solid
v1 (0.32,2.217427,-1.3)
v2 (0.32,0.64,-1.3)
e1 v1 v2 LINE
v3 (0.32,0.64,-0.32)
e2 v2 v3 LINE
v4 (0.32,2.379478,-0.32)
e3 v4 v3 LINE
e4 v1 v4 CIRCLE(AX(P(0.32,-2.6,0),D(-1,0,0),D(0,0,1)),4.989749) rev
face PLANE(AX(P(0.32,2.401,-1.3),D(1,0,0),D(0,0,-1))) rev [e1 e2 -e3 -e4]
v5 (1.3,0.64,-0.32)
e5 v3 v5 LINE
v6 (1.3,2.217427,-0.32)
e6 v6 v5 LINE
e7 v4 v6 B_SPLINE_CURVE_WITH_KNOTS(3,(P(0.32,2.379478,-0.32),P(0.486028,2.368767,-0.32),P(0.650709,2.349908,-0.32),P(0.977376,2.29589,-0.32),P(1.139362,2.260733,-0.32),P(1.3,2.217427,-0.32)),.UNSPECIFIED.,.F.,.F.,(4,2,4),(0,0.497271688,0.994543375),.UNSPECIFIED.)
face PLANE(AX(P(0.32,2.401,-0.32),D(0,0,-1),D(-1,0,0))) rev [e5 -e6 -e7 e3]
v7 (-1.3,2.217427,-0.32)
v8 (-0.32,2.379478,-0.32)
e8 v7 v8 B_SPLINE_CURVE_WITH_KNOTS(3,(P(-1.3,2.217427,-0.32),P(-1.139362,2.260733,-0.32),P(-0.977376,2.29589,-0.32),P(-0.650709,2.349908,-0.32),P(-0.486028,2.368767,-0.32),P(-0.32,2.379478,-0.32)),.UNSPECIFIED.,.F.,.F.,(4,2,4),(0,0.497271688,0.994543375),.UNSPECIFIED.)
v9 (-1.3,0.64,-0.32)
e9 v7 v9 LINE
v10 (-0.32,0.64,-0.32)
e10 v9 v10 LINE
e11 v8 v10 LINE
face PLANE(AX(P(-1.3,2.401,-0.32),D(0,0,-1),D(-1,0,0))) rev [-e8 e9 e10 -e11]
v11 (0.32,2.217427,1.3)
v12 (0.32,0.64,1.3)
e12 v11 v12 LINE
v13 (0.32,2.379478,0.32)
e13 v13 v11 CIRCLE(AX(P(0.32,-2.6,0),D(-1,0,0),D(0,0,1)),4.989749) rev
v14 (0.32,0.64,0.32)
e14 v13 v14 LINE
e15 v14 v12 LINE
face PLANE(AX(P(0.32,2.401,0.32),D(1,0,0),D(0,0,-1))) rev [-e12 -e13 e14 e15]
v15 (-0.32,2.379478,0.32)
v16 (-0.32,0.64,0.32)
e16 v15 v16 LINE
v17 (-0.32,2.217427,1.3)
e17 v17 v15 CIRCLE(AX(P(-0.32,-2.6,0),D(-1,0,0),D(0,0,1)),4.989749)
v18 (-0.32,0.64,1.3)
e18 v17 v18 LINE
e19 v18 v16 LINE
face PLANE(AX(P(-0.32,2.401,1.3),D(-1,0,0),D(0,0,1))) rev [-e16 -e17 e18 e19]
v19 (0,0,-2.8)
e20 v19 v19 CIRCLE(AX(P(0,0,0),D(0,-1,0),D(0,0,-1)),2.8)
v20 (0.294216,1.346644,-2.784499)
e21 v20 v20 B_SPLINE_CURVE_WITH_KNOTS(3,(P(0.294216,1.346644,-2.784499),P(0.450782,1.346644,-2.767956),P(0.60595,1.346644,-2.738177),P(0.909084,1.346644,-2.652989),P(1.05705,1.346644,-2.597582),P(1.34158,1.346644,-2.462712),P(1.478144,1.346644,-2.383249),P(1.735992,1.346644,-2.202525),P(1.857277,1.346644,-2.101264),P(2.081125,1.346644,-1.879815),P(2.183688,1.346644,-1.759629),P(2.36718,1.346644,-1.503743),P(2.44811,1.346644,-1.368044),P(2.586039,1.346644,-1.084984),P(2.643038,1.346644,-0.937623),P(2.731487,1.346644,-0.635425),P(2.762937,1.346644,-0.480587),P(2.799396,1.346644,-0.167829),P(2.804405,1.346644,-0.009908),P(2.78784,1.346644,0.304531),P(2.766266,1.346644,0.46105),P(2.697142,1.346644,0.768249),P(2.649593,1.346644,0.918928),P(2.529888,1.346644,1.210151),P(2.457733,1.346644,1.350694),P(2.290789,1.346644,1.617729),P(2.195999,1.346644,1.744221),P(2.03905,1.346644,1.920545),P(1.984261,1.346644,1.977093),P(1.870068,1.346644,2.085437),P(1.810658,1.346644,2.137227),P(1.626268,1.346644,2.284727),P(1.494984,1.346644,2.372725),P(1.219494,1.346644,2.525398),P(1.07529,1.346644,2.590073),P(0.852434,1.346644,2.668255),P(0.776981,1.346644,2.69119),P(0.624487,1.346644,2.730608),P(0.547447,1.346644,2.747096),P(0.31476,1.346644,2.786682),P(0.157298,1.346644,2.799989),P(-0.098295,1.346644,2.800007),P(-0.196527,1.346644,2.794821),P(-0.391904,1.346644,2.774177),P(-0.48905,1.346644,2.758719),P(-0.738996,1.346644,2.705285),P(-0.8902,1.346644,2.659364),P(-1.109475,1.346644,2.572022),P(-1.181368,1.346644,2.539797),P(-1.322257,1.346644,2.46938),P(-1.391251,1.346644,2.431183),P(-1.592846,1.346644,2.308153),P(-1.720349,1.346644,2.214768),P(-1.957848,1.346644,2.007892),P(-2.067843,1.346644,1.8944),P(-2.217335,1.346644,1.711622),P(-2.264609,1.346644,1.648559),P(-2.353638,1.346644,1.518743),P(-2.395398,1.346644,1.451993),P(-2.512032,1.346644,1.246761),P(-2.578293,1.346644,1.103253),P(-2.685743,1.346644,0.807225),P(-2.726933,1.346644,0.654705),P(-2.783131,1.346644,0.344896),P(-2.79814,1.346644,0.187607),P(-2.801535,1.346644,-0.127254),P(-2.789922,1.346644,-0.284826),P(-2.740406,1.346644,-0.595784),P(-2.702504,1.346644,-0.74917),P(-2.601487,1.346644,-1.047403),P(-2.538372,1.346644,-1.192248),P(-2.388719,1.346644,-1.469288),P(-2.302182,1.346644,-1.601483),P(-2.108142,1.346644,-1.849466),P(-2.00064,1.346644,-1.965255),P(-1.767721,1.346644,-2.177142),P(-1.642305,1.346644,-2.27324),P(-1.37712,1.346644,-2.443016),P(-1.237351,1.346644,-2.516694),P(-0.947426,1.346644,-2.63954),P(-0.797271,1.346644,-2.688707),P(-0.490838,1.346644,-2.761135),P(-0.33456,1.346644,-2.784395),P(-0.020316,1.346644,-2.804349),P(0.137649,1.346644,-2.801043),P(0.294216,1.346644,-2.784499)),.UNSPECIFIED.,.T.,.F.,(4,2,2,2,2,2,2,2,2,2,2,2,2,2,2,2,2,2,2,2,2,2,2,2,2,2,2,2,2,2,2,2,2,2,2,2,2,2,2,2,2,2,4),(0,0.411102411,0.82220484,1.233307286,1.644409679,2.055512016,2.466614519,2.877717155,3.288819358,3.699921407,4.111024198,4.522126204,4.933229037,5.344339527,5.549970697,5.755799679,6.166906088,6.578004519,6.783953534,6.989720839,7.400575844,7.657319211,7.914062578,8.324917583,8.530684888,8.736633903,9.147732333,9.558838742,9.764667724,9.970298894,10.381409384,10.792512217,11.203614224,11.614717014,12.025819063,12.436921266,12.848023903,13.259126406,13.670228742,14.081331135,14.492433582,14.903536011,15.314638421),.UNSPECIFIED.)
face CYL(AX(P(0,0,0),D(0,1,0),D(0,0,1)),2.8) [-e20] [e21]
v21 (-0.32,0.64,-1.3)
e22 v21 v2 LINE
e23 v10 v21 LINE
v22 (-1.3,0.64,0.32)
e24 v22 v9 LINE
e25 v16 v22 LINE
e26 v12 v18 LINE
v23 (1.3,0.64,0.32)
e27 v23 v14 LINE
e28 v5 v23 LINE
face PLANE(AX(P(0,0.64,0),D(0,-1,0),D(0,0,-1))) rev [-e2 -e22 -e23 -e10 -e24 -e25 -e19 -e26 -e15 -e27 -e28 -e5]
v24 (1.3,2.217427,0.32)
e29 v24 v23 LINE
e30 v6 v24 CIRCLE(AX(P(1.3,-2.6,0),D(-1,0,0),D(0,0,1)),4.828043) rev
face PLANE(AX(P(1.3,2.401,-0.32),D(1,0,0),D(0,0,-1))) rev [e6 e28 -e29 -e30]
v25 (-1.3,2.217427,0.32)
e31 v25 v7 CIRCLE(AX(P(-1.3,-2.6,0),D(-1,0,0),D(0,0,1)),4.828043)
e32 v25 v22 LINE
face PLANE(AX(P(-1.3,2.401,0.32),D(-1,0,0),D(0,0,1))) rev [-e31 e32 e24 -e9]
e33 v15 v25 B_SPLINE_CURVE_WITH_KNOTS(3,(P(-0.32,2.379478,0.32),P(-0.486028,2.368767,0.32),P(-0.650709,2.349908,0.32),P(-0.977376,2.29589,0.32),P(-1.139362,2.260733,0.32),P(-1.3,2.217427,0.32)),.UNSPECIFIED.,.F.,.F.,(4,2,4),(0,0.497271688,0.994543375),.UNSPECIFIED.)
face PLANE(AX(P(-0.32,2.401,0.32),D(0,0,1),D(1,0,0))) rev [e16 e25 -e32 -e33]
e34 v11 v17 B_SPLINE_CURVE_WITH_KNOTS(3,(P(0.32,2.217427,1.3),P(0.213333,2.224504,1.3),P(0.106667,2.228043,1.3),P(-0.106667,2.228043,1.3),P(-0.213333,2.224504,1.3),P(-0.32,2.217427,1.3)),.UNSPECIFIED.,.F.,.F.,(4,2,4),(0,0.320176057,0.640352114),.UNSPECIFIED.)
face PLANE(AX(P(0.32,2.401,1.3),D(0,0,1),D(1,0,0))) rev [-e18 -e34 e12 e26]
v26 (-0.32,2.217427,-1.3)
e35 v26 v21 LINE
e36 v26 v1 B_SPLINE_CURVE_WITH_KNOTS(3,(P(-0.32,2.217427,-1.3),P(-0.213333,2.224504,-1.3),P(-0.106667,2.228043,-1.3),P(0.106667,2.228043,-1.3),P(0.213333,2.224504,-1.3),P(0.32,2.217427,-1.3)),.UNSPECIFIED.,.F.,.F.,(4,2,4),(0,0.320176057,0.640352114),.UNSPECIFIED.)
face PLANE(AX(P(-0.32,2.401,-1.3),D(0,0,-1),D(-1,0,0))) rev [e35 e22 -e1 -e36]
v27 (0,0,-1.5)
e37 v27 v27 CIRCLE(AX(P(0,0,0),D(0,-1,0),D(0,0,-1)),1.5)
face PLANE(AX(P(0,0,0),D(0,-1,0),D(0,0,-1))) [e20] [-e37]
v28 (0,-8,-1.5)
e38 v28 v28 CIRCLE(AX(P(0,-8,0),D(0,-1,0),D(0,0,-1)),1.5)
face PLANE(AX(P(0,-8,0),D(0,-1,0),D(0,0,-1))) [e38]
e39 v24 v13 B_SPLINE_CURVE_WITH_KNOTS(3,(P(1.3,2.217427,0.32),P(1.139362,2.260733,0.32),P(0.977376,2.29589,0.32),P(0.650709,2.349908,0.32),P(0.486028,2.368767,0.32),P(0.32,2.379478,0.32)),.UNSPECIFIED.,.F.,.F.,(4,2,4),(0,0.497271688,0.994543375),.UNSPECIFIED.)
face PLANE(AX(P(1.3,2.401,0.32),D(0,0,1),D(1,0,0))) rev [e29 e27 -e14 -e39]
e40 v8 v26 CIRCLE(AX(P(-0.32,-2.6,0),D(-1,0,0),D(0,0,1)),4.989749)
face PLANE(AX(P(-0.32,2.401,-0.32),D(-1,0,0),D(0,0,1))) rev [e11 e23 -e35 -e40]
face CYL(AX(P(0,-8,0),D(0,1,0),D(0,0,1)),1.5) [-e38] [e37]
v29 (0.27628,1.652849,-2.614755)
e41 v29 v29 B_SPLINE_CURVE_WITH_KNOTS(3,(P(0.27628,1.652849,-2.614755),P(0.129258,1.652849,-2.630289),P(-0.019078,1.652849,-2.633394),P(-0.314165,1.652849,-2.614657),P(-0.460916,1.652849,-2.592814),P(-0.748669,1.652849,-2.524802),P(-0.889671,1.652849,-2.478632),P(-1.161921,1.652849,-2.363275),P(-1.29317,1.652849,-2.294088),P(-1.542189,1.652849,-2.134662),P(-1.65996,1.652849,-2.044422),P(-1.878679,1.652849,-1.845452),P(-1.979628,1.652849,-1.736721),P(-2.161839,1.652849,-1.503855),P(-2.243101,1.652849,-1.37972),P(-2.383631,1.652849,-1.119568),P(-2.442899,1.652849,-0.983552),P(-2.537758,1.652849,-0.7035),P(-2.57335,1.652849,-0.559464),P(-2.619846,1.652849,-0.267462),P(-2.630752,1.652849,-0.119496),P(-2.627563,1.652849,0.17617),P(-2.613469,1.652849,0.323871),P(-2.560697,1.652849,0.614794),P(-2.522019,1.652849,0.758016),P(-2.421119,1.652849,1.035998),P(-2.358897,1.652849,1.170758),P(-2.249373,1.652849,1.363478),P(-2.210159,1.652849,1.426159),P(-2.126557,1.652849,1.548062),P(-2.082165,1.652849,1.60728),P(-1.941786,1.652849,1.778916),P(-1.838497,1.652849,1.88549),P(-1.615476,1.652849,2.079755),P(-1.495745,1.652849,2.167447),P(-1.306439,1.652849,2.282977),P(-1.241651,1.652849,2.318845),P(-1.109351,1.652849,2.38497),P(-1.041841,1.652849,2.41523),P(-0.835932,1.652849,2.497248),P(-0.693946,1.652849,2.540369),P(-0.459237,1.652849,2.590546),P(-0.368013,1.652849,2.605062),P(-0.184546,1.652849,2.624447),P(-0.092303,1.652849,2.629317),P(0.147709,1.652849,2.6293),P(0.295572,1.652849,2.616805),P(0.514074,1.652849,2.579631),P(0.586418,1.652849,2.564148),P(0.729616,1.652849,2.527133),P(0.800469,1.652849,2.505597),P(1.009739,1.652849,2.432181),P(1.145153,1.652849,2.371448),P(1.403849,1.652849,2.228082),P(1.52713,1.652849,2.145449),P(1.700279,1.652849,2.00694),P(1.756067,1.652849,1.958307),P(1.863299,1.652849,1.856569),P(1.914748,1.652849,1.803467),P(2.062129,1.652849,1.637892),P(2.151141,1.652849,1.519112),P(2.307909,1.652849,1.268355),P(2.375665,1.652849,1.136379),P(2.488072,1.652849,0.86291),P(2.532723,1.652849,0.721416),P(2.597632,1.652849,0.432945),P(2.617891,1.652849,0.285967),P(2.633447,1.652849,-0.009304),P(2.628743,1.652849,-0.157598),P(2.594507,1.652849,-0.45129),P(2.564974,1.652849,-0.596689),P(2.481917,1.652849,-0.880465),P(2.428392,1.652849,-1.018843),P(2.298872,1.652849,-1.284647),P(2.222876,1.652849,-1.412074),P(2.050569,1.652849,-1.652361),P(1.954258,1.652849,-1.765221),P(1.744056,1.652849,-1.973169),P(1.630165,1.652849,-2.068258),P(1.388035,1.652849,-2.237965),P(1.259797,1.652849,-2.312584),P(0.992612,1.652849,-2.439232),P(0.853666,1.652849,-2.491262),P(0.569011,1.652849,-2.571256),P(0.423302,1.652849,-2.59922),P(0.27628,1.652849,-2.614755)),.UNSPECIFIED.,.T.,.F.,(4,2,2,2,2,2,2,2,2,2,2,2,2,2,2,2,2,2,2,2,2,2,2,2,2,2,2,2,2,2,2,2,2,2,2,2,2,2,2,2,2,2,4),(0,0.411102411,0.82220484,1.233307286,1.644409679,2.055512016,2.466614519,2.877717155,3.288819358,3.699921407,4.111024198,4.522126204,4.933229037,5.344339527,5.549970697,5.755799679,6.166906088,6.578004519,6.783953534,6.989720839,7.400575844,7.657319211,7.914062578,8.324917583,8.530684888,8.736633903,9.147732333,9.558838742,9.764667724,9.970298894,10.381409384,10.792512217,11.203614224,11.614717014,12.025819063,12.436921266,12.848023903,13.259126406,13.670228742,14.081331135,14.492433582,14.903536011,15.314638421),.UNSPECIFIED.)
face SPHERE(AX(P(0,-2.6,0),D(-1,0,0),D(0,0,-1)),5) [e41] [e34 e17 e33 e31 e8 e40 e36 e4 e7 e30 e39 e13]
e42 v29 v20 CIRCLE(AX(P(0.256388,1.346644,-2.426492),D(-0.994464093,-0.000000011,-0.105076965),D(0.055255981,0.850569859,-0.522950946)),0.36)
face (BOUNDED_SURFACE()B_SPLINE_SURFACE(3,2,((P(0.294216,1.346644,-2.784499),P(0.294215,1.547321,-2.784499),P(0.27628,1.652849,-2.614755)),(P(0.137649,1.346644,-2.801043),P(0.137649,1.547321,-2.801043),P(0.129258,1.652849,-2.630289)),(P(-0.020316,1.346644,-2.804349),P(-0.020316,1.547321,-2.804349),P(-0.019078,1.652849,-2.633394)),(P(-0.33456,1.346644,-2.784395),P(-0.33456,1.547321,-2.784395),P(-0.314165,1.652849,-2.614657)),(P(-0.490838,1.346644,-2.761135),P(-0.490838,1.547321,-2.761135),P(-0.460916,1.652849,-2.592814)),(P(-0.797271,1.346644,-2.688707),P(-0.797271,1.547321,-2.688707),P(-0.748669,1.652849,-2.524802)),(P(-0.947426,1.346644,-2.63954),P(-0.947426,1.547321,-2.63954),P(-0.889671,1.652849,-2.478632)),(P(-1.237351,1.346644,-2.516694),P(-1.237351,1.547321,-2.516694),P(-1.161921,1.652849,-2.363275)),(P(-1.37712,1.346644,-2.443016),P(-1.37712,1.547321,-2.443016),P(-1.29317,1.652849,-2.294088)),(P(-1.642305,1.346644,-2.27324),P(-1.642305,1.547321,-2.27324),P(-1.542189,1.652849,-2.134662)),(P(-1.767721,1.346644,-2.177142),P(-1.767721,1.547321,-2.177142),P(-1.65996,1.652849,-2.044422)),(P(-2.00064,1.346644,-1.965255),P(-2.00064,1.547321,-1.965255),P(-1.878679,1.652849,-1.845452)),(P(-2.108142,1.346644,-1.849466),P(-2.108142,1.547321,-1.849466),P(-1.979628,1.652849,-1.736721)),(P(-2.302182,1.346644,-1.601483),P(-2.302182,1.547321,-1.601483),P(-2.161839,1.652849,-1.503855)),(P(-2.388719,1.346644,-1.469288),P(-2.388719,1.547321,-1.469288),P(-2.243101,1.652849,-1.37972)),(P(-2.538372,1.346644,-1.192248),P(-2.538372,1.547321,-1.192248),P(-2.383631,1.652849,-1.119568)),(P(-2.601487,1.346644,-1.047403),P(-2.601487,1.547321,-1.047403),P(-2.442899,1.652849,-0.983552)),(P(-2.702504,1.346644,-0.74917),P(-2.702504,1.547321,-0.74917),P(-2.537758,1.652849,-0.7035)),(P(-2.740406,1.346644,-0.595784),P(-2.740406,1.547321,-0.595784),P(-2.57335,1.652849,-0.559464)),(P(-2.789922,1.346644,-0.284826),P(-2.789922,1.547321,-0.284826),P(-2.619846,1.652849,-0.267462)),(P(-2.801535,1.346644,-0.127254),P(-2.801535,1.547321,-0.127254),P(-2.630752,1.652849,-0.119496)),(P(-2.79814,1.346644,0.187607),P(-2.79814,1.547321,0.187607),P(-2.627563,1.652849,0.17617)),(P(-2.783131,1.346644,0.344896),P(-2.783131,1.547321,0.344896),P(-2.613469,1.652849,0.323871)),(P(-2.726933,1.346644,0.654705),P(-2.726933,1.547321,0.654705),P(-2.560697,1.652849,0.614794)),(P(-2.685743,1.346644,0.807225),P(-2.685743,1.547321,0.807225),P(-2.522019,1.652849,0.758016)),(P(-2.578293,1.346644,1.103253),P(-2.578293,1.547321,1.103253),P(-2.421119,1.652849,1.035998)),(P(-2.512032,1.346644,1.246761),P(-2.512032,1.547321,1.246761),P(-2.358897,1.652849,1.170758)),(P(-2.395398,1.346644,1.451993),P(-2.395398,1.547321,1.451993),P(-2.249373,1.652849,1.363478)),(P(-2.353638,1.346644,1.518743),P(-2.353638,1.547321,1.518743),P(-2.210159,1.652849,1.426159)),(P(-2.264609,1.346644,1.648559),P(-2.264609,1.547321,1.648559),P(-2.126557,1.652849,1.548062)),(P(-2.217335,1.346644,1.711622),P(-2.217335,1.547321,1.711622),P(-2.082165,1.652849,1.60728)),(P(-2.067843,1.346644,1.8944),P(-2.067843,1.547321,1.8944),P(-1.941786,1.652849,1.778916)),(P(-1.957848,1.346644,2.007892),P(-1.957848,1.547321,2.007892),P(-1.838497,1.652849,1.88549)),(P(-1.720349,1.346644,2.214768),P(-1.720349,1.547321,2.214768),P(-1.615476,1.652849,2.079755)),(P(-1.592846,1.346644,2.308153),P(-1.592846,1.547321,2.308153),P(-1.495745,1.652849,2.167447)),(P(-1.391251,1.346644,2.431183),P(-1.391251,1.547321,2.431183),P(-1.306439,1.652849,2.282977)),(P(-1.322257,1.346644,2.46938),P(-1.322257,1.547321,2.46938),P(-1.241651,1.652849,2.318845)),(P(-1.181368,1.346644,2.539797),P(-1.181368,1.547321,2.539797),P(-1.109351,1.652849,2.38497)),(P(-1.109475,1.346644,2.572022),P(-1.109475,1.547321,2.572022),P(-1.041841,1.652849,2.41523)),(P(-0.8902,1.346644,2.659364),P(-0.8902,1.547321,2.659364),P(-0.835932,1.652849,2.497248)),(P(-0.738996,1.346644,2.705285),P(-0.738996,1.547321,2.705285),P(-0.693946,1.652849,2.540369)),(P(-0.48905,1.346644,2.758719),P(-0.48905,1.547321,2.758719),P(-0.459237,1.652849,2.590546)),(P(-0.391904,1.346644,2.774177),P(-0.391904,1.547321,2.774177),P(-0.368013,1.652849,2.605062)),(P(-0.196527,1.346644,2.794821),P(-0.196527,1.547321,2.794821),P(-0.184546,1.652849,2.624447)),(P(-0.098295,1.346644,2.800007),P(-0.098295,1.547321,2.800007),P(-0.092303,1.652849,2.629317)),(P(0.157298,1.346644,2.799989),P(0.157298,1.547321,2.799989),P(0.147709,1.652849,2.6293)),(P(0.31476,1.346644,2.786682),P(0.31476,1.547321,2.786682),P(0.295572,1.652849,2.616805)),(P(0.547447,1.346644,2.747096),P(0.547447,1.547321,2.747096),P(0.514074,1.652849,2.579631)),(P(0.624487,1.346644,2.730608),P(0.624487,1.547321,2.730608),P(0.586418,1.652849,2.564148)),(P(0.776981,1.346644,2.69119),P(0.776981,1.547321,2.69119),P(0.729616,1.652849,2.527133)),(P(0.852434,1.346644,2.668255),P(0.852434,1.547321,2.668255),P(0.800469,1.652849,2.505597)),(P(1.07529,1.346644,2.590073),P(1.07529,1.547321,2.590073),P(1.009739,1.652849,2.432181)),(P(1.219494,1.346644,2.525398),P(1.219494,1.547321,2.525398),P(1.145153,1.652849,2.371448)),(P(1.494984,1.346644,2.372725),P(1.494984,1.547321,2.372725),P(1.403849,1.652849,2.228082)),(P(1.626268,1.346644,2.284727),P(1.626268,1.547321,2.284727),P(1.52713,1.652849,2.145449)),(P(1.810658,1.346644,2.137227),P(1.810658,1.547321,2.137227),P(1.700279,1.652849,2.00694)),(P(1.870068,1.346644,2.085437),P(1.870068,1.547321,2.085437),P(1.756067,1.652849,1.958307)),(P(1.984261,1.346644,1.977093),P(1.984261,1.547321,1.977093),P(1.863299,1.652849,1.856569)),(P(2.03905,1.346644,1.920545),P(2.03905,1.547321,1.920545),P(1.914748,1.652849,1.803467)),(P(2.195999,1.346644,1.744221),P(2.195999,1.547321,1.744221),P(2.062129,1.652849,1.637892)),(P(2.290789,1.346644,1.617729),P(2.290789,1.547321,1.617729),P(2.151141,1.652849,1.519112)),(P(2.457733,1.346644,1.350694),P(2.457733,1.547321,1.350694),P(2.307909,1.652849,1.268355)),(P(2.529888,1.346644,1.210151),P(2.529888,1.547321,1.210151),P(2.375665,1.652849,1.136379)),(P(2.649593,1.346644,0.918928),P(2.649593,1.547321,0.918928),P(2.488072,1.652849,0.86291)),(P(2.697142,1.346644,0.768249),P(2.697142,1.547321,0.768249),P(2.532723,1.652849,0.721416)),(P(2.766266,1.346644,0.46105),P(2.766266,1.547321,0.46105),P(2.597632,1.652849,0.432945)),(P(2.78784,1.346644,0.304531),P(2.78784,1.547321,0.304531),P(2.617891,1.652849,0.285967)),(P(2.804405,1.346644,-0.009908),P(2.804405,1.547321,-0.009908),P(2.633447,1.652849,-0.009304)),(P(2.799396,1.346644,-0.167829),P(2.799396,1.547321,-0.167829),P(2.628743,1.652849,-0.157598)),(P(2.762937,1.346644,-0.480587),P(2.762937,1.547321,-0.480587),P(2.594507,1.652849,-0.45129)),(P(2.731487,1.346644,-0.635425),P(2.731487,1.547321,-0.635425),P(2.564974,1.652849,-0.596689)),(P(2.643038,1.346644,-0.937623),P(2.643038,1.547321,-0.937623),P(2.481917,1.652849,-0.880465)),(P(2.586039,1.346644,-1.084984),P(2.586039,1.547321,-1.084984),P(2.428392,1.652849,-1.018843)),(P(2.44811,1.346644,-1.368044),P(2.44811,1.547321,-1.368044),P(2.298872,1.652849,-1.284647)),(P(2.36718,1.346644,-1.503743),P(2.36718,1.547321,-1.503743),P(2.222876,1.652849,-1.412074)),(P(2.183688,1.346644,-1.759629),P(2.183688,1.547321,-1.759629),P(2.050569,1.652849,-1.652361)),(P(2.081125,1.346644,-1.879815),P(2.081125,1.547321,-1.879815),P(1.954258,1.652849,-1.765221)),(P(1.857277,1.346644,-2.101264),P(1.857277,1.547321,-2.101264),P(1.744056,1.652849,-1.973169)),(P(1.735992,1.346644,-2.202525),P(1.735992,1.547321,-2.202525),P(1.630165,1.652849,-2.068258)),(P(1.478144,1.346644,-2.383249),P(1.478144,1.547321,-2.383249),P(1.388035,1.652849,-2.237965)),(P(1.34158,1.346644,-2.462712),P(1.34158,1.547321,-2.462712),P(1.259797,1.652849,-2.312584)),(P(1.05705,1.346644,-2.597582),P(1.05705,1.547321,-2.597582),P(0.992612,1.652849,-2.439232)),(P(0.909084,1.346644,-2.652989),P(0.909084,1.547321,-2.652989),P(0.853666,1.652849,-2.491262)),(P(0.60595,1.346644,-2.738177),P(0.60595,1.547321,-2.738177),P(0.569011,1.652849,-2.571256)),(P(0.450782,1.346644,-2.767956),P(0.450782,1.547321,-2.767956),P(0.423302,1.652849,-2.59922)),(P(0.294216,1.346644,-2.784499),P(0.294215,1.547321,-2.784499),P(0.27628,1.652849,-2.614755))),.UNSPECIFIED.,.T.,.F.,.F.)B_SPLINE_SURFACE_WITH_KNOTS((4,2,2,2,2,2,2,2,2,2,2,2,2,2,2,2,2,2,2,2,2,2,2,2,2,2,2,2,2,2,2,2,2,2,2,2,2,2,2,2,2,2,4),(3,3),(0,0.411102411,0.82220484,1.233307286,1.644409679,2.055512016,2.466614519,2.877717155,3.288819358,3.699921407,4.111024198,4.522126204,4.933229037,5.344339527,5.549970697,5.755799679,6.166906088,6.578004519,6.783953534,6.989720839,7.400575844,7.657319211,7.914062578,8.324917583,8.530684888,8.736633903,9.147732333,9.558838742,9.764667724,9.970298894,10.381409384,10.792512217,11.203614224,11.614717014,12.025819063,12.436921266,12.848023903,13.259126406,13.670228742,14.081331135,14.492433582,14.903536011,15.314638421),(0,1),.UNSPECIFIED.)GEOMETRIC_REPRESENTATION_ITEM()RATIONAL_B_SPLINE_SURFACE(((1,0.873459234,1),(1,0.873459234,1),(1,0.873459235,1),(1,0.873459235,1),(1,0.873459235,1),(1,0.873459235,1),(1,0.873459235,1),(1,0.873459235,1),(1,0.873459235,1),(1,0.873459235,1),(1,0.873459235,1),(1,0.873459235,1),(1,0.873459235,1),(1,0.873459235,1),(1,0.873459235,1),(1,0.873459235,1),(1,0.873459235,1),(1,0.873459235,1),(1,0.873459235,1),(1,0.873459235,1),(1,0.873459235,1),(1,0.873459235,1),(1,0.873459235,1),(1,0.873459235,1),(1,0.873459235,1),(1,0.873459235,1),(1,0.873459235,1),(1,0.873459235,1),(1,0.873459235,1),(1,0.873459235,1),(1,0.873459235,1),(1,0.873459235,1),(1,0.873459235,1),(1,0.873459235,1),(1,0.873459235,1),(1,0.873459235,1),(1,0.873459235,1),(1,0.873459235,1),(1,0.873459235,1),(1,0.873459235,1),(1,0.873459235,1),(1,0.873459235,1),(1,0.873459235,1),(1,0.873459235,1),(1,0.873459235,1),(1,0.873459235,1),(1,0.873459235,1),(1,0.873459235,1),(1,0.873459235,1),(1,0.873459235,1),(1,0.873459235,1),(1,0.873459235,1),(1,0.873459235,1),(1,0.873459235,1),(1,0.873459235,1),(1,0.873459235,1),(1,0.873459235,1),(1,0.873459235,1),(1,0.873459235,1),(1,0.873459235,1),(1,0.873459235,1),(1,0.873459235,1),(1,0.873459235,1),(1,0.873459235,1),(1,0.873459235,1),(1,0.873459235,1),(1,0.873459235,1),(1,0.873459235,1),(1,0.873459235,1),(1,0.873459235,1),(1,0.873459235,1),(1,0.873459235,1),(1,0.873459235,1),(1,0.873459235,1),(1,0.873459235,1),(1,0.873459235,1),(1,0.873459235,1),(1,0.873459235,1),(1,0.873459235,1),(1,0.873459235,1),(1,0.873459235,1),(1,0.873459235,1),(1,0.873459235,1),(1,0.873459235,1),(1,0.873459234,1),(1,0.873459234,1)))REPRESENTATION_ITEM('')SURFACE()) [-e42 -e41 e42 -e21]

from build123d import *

# Parameters (mm, degrees)
SKETCH2_R           = 1.5
BOSS_EXTRUDE2_DEPTH = 8
CUT_EXTRUDE1_REACH  = 11.504
FILLET1_R           = 0.36


with BuildPart() as part:
    # Boss-Extrude1: read off the stored shape, not the designer's step
    # Boss-Extrude1 outline → Boss-Extrude1 (revolve)
    with BuildSketch(Plane.XY):
        with BuildLine():
            Line((2.8, 0), (2.8, 1.542463035))
            ThreePointArc((2.8, 1.542463035), (1.464186604, 2.180811394), (0, 2.4))
            Line((0, 2.4), (0, 0))
            Line((0, 0), (2.8, 0))
        make_face()
    revolve(axis=Axis((0, 0, 0), (0, 1, 0)))

    # Sketch2 → Boss-Extrude2 (add)
    with BuildSketch(Plane.XZ):
        with Locations(Location((0, 0, 0), (0, 0, 270))):
            Circle(SKETCH2_R)
    extrude(amount=BOSS_EXTRUDE2_DEPTH)

    # Sketch3 → Cut-Extrude1 (cut, up to next)
    with BuildSketch(Plane.XZ.offset(-0.64), mode=Mode.PRIVATE) as cut_extrude1_sk1:
        Polygon((-0.32, -1.3), (0.32, -1.3), (0.32, -0.32), (1.3, -0.32), (1.3, 0.32), (0.32, 0.32), (0.32, 1.3), (-0.32, 1.3), (-0.32, 0.32), (-1.3, 0.32), (-1.3, -0.32), (-0.32, -0.32), align=None)
    cut_extrude1_tool1 = extrude(cut_extrude1_sk1.sketch, amount=-CUT_EXTRUDE1_REACH, mode=Mode.PRIVATE) & part.part
    add(cut_extrude1_tool1.solids().sort_by_distance((0, 0.64, 0))[0], mode=Mode.SUBTRACT)

    # Fillet1
    fillet1_edges = [part.edges().sort_by_distance(p)[0] for p in [
        (-2.8, 1.542463035, 0),
    ]]
    fillet(fillet1_edges, radius=FILLET1_R)


solid = part.part
